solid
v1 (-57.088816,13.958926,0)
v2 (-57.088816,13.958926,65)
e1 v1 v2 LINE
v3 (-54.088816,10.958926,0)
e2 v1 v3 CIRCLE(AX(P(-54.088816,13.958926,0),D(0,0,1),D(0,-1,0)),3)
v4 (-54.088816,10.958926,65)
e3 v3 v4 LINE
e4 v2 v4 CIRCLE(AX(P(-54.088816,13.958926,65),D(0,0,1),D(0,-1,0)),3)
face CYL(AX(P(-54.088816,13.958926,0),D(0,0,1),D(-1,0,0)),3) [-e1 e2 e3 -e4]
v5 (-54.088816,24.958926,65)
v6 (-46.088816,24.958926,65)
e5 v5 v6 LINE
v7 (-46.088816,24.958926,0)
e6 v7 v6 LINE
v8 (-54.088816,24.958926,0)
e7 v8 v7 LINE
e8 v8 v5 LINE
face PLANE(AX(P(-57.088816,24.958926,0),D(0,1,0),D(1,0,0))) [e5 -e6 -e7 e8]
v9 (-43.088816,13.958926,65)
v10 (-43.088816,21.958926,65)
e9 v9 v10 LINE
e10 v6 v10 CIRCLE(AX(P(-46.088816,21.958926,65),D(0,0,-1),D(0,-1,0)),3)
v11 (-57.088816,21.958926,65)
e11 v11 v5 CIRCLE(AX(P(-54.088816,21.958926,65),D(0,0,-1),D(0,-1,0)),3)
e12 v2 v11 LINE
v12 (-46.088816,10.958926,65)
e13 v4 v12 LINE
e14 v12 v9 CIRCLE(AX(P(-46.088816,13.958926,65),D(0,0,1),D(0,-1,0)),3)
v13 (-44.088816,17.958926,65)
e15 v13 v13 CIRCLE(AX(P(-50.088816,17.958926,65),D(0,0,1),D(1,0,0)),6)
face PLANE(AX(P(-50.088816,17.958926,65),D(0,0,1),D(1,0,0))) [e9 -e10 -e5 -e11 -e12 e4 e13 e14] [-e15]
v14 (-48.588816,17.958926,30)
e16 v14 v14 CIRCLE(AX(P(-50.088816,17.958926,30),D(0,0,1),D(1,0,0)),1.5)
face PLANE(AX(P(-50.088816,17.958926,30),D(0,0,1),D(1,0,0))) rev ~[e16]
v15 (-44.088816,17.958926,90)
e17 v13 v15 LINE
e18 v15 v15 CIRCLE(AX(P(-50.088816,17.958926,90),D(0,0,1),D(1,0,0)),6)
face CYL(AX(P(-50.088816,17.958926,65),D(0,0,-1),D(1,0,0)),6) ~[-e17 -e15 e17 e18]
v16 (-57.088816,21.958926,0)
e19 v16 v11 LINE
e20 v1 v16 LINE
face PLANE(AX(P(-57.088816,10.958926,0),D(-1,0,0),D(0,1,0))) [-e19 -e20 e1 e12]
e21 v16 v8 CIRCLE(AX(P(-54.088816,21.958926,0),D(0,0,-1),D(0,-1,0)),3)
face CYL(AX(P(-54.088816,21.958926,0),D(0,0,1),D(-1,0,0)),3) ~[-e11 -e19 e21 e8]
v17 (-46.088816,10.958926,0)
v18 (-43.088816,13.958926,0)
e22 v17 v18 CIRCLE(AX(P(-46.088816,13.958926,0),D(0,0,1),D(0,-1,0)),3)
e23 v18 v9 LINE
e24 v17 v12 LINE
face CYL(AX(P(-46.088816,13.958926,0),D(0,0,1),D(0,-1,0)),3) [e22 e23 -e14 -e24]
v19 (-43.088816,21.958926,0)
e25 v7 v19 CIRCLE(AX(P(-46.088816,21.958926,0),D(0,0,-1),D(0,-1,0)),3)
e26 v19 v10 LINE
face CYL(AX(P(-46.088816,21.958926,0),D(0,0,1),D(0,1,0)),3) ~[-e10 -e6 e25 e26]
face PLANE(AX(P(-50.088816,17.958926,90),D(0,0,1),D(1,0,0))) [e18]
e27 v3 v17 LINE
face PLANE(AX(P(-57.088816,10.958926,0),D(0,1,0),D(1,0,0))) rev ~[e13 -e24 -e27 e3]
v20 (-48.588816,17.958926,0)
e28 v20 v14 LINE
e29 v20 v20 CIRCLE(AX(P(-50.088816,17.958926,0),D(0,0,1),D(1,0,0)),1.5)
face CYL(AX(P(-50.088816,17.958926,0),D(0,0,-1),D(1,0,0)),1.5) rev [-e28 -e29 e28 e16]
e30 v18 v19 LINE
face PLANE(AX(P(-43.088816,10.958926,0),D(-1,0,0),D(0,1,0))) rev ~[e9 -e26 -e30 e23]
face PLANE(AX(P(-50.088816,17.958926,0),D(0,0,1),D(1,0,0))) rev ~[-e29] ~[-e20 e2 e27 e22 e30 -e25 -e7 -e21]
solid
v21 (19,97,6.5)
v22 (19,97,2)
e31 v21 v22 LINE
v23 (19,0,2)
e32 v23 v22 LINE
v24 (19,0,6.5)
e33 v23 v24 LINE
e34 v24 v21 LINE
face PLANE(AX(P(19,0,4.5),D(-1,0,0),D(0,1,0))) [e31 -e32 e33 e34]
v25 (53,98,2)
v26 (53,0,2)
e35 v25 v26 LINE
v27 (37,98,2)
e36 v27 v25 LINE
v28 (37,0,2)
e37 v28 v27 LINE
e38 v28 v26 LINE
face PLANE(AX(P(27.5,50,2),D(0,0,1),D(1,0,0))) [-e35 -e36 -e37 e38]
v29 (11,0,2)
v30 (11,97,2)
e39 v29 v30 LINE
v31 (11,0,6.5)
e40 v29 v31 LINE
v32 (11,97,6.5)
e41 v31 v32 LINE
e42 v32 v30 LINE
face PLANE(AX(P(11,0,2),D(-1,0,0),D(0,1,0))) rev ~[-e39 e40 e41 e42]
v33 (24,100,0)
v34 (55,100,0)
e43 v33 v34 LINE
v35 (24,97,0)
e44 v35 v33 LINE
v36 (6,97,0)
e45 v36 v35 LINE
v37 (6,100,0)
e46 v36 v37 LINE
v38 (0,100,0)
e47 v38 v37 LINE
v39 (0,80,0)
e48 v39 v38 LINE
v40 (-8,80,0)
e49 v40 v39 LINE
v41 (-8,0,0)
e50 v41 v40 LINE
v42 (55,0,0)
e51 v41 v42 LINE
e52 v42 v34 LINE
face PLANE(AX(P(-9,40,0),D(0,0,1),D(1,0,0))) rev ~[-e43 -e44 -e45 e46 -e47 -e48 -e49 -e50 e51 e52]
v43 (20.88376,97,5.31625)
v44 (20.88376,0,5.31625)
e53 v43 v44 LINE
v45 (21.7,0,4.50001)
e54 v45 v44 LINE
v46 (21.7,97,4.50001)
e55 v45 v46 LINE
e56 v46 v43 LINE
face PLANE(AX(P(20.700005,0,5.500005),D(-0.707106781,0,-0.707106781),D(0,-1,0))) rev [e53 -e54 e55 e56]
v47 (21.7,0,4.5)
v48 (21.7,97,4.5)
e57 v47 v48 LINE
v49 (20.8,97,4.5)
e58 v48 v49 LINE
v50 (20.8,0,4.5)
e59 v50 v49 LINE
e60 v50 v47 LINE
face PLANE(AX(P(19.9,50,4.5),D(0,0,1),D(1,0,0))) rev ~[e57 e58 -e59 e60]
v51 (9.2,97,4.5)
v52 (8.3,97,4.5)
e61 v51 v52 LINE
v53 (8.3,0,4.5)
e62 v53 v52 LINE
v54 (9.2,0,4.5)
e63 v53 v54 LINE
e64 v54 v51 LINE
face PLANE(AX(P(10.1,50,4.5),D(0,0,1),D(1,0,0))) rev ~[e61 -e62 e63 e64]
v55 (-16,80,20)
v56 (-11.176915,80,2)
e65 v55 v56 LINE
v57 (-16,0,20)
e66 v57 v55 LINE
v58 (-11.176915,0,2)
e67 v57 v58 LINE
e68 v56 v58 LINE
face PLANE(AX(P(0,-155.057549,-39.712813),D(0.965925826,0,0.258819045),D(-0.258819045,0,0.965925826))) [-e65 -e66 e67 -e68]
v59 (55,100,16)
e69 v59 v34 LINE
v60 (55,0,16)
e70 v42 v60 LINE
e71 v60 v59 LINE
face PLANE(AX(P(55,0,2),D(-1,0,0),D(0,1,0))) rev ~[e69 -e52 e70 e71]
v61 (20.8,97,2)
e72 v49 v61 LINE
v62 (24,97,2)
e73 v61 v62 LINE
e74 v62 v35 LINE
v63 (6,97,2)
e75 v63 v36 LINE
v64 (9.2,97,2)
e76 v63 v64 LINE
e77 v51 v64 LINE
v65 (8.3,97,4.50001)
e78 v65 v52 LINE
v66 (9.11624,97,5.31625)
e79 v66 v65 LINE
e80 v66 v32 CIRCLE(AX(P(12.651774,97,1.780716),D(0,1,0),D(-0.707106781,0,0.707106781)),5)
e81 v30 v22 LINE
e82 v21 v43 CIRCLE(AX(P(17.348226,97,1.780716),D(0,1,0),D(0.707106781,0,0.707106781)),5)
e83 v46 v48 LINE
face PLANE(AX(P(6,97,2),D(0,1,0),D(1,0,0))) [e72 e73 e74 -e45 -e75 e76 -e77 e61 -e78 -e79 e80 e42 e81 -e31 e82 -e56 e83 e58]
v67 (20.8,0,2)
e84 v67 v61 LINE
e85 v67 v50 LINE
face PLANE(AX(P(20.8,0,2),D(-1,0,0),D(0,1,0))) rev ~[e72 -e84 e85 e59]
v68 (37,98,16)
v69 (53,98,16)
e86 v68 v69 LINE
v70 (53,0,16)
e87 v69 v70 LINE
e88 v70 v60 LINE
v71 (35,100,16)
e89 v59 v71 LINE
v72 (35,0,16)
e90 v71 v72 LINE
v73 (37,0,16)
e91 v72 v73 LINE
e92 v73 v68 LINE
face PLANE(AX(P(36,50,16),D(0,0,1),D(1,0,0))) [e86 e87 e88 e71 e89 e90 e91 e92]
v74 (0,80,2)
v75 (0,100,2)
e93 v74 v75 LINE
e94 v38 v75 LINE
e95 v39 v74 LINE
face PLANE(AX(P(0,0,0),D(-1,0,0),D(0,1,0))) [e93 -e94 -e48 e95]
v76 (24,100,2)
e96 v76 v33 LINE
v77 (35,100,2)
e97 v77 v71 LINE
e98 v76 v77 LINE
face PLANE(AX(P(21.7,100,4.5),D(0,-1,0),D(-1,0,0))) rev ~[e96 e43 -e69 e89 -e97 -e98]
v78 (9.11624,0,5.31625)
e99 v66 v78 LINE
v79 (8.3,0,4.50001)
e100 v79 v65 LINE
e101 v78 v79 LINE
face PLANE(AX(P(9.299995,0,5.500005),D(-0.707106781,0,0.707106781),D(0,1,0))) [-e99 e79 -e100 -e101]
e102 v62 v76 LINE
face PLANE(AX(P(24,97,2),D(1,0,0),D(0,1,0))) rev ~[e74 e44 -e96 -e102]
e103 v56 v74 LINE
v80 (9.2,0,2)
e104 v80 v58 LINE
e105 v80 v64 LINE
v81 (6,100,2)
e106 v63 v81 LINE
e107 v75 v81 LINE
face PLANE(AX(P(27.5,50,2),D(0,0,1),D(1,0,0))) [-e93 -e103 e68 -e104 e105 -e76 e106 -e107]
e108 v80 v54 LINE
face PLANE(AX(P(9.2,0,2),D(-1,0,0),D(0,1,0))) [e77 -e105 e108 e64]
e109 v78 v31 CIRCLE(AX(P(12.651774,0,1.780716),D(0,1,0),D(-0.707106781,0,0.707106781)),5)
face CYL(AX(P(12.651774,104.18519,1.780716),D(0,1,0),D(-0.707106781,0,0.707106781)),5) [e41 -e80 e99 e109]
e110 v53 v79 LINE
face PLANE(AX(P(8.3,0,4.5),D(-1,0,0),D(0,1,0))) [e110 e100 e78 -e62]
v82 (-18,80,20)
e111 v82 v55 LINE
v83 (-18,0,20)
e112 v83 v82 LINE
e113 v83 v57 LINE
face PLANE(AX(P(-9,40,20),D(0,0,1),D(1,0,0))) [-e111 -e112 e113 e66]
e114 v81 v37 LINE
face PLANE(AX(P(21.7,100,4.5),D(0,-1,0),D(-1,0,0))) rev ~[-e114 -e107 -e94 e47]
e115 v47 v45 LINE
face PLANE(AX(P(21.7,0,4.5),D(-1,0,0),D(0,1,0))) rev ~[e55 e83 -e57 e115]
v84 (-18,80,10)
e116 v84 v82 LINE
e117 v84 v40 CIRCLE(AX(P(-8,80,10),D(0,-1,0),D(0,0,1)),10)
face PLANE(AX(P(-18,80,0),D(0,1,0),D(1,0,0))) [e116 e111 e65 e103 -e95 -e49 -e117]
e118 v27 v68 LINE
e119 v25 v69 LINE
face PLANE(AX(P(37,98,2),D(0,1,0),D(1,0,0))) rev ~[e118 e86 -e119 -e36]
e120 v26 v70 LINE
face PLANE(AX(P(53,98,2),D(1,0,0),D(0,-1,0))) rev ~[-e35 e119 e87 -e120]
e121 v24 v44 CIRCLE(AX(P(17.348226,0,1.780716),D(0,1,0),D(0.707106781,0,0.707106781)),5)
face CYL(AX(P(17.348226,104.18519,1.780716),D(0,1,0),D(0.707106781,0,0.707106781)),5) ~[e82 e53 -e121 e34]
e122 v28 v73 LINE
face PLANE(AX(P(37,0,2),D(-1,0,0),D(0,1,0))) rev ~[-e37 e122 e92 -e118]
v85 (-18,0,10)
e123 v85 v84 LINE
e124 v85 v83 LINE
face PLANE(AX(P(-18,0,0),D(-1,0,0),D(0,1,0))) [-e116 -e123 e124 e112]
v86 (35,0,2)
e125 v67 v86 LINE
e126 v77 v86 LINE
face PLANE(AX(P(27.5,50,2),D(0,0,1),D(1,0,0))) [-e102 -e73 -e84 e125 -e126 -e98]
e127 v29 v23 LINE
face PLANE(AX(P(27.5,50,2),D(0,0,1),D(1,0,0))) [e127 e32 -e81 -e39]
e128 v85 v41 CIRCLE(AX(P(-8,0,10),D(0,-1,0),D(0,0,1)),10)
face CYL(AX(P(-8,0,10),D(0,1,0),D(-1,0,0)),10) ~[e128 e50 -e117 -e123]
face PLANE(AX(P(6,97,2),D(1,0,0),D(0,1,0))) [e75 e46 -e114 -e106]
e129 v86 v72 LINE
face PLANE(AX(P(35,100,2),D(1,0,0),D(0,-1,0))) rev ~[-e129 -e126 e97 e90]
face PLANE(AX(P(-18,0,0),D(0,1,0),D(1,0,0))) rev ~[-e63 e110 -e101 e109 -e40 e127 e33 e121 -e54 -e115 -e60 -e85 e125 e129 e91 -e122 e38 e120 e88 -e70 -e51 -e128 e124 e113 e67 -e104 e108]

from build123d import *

# Parameters (mm, degrees)
F0_W           = 55
F0_H           = 100
F1_DEPTH       = 2
F2_W           = 16
F2_H           = 2
F3_DEPTH       = 14
F4_W           = 1.8
F4_H           = 100
F5_DEPTH       = 2.5
F7_W           = 1.8
F7_H           = 100
F7_W_2         = 0.9
F6_W           = 1.8
F6_H           = 100
F6_W_2         = 0.9
F8_DEPTH       = 2
F9_SIZE        = 1.99999
F10_T1_DEPTH   = 108.3703792641
F11_W          = 5
F11_H          = 3
F11_W_2        = 8
F12_DEPTH      = 2.001
F12_DEPTH_BACK = 10
F13_W          = 14
F13_H          = 14
F15_DEPTH      = 65
F16_R          = 6
F17_DEPTH      = 25
F18_R          = 3
F19_R          = 1.5
F20_DEPTH      = 30
F21_W          = 18
F21_H          = 80
F22_DEPTH      = 20
F23_T4_DEPTH   = 390.1150986591
F24_R          = 10


# Not quite as in the source:
# - a fillet or chamfer that OpenCascade refuses, or shapes differently, is made with other operations: its cross-section is extruded or revolved along the edge and cut away or added
# - a fillet or chamfer is up to 0.001 mm smaller than in the source, because OpenCascade refuses the exact size


with BuildPart() as f1:
    # F0 (on Top) → F1 (new body)
    with BuildSketch(Plane.XY):
        with Locations((27.5, 50)):
            Rectangle(F0_W, F0_H)
    extrude(amount=F1_DEPTH)

    # F2 (on face) → F3 (join)
    with BuildSketch(Plane.XY.offset(2)):
        Polygon((37, 98), (37, 100), (35, 100), (35, 0), (37, 0), align=None)
        Polygon((55, 0), (55, 100), (53, 100), (53, 98), (53, 0), align=None)
        with Locations((45, 99)):
            Rectangle(F2_W, F2_H)
    extrude(amount=F3_DEPTH)

    # F4 (on face) → F5 (join)
    with BuildSketch(Plane.XY.offset(2)):
        with Locations((10.1, 50)):
            Rectangle(F4_W, F4_H)
        with Locations((19.9, 50)):
            Rectangle(F4_W, F4_H)
    extrude(amount=F5_DEPTH)

    # F7 (on face) + F6 (on face) → F8 (join)
    with BuildSketch(Plane.XY.offset(4.5)):
        with Locations((19.9, 50)):
            Rectangle(F7_W, F7_H)
        with Locations((21.25, 50)):
            Rectangle(F7_W_2, F7_H)
    with BuildSketch(Plane.XY.offset(4.5)):
        with Locations((10.1, 50)):
            Rectangle(F6_W, F6_H)
        with Locations((8.75, 50)):
            Rectangle(F6_W_2, F6_H)
    extrude(amount=F8_DEPTH)

    # F9 (size 2 in the source; OpenCascade refuses exactly that, so slightly less here)
    f9_edges = [f1.edges().sort_by_distance(p)[0] for p in [
        (8.3, 50, 6.5),
        (21.7, 50, 6.5),
    ]]
    chamfer(f9_edges, length=F9_SIZE)

    # F10: fillet of radius 5 on 2 edges, made by hand

    # F10_s2 → F10_t1 (cut)
    with BuildSketch(Plane.XZ.offset(-104.1851896321)):
        with BuildLine():
            ThreePointArc((9.1162396122, 5.3162496122), (9.9914434967, 6.0142301065), (11, 6.5))
            Line((11, 6.5), (10.29999, 6.5))
            Line((10.29999, 6.5), (9.1162396122, 5.3162496122))
        make_face()
        with BuildLine():
            ThreePointArc((20.8837603878, 5.3162496122), (20.0085565033, 6.0142301065), (19, 6.5))
            Line((19, 6.5), (19.70001, 6.5))
            Line((19.70001, 6.5), (20.8837603878, 5.3162496122))
        make_face()
    extrude(amount=F10_T1_DEPTH, mode=Mode.SUBTRACT)

    # F11 (on face) → F12 (cut, two sides)
    with BuildSketch(Plane.XY.offset(2)) as f12_sk:
        with Locations((8.5, 98.5)):
            Rectangle(F11_W, F11_H)
        with Locations((15, 98.5)):
            Rectangle(F11_W_2, F11_H)
        with Locations((21.5, 98.5)):
            Rectangle(F11_W, F11_H)
    extrude(amount=-F12_DEPTH, mode=Mode.SUBTRACT)
    extrude(f12_sk.sketch, amount=F12_DEPTH_BACK, mode=Mode.SUBTRACT)

    # F21 (on Top) → F22 (join)
    with BuildSketch(Plane.XY):
        with Locations((-9, 40)):
            Rectangle(F21_W, F21_H)
    extrude(amount=F22_DEPTH)

    # F23: chamfer of 16 x 59.7128129211 on 1 edges, made by hand


with BuildPart() as f15:
    # F13 (on Top) → F15 (new body)
    with BuildSketch(Plane.XY):
        with Locations((-50.0888161063, 17.9589258209)):
            Rectangle(F13_W, F13_H)
    extrude(amount=F15_DEPTH)

    # F16 (on face) → F17 (join)
    with BuildSketch(Plane.XY.offset(65)):
        with Locations((-50.0888161063, 17.9589258209)):
            Circle(F16_R)
    extrude(amount=F17_DEPTH)

    # F18
    f18_edges = [f15.edges().sort_by_distance(p)[0] for p in [
        (-57.088816, 10.958926, 32.5),
        (-43.088816, 10.958926, 32.5),
        (-43.088816, 24.958926, 32.5),
        (-57.088816, 24.958926, 32.5),
    ]]
    fillet(f18_edges, radius=F18_R)

    # F19 (on face) → F20 (cut)
    with BuildSketch(Plane.XY):
        with Locations((-50.0888161063, 17.9589258209)):
            Circle(F19_R)
    extrude(amount=F20_DEPTH, mode=Mode.SUBTRACT)


with BuildPart() as f23_tool2:
    # F23_s3 → F23_t4 (new body)
    with BuildSketch(Plane.XZ.offset(155.0575493296)):
        Polygon((0, -39.7128129211), (-16, 20), (0, 20), align=None)
    extrude(amount=-F23_T4_DEPTH)

    split(bisect_by=Plane.XY.offset(2), keep=Keep.TOP)


with BuildPart() as f1_1:
    add(f1.part)

    # F23_t1: cut F23_tool2
    add(f23_tool2.part, mode=Mode.SUBTRACT)

    # F24
    f24_edges = [f1_1.edges().sort_by_distance(p)[0] for p in [
        (-18, 40, 0),
    ]]
    fillet(f24_edges, radius=F24_R)


solid = Compound([f15.part, f1_1.part])
